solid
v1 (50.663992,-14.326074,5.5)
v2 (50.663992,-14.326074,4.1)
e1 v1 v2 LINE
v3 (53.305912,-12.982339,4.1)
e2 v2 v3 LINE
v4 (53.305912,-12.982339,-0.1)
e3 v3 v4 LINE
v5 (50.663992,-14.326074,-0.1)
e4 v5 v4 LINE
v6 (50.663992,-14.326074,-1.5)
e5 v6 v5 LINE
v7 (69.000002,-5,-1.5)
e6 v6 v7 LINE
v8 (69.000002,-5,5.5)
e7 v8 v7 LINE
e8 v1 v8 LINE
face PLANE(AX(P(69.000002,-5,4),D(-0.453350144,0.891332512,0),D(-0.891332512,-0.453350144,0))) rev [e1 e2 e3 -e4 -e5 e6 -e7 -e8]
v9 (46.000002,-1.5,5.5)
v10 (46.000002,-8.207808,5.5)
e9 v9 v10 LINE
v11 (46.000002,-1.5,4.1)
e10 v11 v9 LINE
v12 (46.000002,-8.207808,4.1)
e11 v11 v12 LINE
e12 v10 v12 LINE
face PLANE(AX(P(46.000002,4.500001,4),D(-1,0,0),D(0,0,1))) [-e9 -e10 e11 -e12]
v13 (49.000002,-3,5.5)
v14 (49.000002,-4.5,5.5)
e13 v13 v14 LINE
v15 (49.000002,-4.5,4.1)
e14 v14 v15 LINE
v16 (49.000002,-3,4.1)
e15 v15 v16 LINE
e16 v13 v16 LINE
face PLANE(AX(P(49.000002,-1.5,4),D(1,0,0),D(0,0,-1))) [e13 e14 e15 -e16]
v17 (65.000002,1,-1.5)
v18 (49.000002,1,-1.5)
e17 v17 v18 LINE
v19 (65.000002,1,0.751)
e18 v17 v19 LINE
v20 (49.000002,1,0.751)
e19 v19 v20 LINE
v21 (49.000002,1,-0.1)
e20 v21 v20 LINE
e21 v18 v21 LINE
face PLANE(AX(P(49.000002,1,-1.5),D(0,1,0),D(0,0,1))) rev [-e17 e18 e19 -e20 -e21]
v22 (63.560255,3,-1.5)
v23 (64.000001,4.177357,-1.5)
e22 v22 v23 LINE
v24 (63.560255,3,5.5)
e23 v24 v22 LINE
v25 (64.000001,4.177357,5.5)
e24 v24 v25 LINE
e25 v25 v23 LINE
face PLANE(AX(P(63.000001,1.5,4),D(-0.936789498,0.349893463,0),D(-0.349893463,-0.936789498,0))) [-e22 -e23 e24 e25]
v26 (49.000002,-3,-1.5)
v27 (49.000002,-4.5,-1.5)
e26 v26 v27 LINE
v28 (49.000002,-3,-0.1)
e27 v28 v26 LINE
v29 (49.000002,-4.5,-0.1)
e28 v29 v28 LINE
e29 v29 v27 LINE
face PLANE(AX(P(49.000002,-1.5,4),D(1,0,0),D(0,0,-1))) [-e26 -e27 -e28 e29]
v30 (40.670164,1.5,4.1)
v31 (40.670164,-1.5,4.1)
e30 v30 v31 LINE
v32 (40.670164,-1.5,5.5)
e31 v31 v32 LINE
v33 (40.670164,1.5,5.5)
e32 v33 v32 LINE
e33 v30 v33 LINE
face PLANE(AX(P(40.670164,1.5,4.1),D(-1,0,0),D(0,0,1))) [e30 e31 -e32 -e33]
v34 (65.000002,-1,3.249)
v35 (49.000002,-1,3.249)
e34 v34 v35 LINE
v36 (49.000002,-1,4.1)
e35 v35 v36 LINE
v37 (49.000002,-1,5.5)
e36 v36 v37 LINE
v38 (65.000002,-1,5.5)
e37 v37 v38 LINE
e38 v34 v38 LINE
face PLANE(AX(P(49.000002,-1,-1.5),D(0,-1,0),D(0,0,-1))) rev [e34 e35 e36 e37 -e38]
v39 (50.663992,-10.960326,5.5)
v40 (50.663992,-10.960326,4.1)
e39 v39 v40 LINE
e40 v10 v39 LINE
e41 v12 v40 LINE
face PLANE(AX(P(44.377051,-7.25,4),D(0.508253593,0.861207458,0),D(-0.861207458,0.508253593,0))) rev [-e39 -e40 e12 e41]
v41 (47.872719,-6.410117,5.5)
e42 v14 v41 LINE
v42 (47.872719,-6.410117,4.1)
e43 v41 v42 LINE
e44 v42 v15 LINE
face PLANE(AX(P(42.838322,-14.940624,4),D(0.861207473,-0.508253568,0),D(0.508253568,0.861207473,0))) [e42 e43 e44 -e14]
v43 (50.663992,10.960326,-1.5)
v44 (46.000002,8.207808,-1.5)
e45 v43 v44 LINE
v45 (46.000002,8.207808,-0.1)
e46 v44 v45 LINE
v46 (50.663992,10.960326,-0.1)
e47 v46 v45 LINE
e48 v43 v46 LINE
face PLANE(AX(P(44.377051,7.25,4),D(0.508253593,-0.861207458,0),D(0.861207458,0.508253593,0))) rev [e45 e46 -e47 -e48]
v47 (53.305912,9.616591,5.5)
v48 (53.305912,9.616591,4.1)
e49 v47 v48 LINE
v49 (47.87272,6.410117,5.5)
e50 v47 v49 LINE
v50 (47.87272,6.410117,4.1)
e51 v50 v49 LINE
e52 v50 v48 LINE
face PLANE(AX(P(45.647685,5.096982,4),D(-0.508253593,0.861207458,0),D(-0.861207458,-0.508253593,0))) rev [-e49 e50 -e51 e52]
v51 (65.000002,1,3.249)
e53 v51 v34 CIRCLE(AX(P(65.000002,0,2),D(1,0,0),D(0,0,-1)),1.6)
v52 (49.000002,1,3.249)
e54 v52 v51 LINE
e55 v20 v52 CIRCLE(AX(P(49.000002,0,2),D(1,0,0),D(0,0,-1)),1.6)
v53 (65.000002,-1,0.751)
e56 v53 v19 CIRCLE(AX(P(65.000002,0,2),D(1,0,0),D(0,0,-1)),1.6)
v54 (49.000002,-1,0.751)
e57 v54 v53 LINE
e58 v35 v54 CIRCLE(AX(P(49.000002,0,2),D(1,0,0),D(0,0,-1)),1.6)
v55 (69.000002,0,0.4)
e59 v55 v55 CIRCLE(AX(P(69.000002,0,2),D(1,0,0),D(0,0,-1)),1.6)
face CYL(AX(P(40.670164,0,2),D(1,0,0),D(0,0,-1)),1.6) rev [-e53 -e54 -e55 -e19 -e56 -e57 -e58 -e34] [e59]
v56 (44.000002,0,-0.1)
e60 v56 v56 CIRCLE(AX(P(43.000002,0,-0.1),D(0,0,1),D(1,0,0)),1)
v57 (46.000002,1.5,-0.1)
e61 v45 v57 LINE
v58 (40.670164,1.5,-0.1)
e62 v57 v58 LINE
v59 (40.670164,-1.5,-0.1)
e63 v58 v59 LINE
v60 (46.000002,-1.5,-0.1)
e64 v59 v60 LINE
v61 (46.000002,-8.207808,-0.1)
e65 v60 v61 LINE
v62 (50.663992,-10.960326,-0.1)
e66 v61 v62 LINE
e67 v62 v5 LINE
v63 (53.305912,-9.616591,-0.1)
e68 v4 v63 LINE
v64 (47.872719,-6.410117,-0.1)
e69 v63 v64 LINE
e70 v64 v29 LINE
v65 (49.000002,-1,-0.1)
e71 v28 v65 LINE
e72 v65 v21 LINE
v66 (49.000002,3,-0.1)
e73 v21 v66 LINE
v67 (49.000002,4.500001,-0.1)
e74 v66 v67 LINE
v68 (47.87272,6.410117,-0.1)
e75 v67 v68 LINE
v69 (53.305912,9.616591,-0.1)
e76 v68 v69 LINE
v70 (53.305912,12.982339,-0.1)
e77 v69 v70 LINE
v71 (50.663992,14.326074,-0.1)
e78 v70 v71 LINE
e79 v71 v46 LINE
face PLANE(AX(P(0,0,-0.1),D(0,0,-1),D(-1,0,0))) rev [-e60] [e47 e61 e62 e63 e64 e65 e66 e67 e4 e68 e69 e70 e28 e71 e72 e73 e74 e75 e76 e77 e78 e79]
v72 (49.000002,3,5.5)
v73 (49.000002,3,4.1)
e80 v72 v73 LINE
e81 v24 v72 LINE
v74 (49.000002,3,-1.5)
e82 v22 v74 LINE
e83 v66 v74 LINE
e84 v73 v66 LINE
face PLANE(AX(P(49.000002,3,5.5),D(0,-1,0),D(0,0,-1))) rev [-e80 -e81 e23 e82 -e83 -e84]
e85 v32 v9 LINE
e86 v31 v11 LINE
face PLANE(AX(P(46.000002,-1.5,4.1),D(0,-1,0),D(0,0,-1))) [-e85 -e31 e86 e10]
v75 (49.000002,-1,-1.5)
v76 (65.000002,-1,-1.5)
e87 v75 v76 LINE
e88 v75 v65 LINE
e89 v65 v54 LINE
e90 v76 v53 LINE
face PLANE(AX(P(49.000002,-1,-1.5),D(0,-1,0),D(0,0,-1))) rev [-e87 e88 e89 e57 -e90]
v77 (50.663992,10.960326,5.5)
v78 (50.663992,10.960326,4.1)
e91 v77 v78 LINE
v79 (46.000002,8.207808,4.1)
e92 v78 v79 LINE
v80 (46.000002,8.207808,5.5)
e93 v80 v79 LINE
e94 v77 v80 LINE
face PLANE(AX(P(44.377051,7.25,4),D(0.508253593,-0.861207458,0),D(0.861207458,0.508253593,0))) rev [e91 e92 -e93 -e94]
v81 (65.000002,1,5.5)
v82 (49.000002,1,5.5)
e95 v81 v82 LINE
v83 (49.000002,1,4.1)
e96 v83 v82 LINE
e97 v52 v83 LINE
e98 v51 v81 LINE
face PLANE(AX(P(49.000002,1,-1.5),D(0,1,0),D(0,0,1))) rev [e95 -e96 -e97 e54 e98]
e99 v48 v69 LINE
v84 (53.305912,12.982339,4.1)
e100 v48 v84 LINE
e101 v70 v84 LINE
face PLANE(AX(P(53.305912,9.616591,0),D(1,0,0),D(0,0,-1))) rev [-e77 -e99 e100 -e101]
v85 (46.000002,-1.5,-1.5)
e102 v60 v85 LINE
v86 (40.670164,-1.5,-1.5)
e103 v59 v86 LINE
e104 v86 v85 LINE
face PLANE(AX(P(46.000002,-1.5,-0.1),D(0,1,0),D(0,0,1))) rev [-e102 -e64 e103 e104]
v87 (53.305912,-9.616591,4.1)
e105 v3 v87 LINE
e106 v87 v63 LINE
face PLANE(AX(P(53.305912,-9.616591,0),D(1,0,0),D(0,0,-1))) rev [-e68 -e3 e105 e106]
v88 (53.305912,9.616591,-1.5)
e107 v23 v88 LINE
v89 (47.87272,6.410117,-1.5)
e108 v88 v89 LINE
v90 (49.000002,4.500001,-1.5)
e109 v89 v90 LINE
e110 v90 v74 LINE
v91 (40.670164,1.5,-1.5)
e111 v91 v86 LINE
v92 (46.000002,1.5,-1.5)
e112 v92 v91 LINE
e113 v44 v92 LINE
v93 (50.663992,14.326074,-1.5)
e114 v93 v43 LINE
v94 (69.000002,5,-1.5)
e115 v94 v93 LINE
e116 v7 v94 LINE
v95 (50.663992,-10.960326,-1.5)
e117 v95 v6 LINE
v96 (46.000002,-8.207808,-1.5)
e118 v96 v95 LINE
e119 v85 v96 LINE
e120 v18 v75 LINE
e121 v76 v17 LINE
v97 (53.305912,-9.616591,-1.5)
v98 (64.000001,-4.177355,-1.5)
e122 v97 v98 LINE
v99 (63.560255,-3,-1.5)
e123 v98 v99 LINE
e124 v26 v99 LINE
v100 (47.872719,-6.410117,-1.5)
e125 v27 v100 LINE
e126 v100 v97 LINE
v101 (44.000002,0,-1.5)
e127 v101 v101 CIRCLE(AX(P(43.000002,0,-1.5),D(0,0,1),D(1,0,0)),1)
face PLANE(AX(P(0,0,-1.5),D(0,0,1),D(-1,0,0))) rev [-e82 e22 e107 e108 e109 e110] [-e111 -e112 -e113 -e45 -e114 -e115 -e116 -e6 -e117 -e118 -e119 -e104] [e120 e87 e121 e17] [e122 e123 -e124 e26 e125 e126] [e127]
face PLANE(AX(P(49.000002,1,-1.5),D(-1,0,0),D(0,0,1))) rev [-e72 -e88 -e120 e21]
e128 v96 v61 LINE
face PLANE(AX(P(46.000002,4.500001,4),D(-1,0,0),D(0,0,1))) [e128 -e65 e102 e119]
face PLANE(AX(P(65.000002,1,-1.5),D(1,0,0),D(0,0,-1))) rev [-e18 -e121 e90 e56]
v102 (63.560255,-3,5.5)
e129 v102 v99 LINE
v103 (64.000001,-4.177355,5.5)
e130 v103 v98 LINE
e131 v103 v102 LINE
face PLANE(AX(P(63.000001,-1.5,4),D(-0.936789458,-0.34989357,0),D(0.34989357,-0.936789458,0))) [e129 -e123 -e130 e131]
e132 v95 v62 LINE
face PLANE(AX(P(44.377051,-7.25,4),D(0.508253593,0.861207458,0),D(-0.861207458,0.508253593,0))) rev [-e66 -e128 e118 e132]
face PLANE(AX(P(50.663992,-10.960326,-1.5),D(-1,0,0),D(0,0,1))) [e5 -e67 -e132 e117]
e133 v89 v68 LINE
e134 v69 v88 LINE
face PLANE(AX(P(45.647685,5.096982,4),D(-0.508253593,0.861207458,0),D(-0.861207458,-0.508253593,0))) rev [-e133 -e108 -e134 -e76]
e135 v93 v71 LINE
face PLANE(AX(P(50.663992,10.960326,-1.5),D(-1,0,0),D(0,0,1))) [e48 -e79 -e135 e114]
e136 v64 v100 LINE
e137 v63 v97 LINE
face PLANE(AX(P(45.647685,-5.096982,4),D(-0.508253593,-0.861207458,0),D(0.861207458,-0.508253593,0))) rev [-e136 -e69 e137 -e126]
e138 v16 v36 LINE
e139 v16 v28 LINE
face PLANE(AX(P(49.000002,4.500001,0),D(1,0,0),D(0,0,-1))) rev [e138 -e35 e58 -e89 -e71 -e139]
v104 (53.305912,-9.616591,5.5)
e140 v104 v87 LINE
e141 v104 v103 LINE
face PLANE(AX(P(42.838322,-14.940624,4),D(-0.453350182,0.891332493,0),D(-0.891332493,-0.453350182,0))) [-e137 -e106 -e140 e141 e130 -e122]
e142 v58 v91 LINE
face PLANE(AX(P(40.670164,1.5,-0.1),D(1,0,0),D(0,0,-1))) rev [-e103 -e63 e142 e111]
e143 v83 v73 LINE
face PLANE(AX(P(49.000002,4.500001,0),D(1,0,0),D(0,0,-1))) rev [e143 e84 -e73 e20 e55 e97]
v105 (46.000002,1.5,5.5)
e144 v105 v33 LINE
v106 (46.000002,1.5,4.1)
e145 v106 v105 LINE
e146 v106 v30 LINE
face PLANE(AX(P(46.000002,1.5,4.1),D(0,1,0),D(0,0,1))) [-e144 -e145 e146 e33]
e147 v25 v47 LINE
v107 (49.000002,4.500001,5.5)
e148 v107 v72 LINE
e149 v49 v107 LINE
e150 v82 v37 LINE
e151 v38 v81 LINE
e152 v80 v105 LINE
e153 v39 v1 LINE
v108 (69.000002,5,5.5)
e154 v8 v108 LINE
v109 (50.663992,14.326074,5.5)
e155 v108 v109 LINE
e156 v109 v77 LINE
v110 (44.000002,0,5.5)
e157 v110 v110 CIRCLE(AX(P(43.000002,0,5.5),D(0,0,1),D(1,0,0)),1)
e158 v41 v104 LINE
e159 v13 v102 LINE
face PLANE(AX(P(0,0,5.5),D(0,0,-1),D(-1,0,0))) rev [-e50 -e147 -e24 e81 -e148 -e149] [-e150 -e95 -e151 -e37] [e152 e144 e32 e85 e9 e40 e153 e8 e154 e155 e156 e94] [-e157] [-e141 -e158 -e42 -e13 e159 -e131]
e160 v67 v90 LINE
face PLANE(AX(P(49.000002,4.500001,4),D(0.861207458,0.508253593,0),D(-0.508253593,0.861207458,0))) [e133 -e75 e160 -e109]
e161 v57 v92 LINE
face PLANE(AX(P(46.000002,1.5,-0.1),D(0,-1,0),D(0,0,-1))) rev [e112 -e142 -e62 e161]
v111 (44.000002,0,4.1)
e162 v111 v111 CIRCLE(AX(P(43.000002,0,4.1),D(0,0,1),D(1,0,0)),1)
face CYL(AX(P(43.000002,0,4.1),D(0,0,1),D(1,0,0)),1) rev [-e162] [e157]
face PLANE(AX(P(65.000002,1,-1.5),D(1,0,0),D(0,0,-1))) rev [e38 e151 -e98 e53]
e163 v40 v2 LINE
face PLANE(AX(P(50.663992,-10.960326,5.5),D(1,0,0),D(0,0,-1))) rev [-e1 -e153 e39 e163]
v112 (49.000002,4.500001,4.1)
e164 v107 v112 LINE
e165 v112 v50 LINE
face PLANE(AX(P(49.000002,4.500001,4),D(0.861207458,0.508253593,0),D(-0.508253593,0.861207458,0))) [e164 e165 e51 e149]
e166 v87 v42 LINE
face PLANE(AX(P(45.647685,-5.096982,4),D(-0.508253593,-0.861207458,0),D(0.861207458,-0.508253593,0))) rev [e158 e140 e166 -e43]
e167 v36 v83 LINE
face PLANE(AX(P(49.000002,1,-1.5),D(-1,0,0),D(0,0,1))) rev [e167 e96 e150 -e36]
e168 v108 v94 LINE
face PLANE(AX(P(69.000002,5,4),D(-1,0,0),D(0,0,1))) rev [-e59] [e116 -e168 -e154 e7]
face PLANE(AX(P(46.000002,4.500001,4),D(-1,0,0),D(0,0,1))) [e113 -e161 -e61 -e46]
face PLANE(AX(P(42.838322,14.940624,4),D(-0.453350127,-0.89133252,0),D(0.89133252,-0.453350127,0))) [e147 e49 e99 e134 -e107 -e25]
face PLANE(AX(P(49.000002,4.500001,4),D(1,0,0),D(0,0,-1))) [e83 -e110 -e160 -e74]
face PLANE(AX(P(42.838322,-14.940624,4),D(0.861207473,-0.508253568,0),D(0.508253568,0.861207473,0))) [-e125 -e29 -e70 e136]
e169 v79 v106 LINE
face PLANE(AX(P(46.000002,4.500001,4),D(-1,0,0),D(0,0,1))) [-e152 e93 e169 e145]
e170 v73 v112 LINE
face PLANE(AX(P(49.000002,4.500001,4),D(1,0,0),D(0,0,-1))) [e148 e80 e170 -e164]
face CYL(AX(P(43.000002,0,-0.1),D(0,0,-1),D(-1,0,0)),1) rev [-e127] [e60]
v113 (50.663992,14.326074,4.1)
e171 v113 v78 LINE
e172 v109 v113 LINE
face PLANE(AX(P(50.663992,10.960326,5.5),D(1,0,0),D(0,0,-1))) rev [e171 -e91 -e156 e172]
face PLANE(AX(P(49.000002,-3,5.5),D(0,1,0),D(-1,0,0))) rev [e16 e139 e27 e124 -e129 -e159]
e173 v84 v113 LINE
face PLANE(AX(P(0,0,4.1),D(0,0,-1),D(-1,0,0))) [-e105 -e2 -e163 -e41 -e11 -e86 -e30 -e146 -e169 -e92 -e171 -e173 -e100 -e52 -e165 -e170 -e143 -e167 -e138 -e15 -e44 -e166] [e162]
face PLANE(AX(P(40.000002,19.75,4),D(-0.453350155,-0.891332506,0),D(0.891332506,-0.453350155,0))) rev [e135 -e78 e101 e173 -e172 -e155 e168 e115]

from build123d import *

# Parameters (mm, degrees)
EXTRUDE_1_DEPTH     = 4
SKETCH_2_R          = 0.9
CUT_EXTRUDE_1_DEPTH = 52
SKETCH_3_W          = 2.000000328
SKETCH_3_H          = 4.999999888
EXTRUDE_2_DEPTH     = 1.5
EXTRUDE_3_DEPTH     = 4
EXTRUDE_4_DEPTH     = 1.5
CUT_EXTRUDE_2_DEPTH = 2
SKETCH_8_W          = 56.707929928
SKETCH_8_H          = 61.814331201
CUT_EXTRUDE_3_DEPTH = 10
EXTRUDE_5_DEPTH     = 2
CUT_EXTRUDE_5_DEPTH = 2.1
SKETCH_12_W         = 5.329837581
SKETCH_12_H         = 3.000000026
SKETCH_12_R         = 1
EXTRUDE_6_DEPTH     = 1.4
SKETCH_13_W         = 16.000000485
SKETCH_13_H         = 2
CUT_EXTRUDE_6_DEPTH = 71.818335642
EXTRUDE_7_DEPTH     = 3.5
SKETCH_10_R         = 1.6
CUT_EXTRUDE_7_DEPTH = 33.219032999


with BuildPart() as part:
    # 草图1 → 凸台-拉伸1 (new body)
    with BuildSketch(Plane.XY):
        with BuildLine():
            Line((66.000003368, -0.999999465), (66.000003368, 1.000000862))
            ThreePointArc((66.000003368, 1.000000862), (65.646447605, 1.853552596), (66.500000656, 1.500000013))
            Line((66.500000656, 1.500000013), (69.000001997, 1.500000013))
            Line((69.000001997, 1.500000013), (69.000001997, 4.999999655))
            Line((69.000001997, 4.999999655), (40.0000019, 19.749999745))
            Line((40.0000019, 19.749999745), (37.000001874, 19.749999745))
            Line((37.000001874, 19.749999745), (37.000001874, 17.250002129))
            ThreePointArc((37.000001874, 17.250002129), (37.353555819, 16.396448761), (36.500001792, 16.750001116))
            Line((36.500001792, 16.750001116), (34.500001871, 16.750001116))
            ThreePointArc((34.500001871, 16.750001116), (33.646447808, 16.396448765), (34.000001848, 17.250002129))
            Line((34.000001848, 17.250002129), (34.000001848, 19.749999745))
            Line((34.000001848, 19.749999745), (31.000001822, 19.749999745))
            Line((31.000001822, 19.749999745), (31.000001822, 16.750001116))
            Line((31.000001822, 16.750001116), (34.000001848, 13.000000967))
            Line((34.000001848, 13.000000967), (34.000001848, 2.500000177))
            Line((34.000001848, 2.500000177), (19.492642954, 2.500000177))
            Line((19.492642954, 2.500000177), (10.000001639, 13.915917603))
            Line((10.000001639, 13.915917603), (10.000001639, 19.749999745))
            Line((10.000001639, 19.749999745), (7.000001147, 19.749999745))
            Line((7.000001147, 19.749999745), (7.000001147, 17.250002129))
            ThreePointArc((7.000001147, 17.250002129), (7.353556004, 16.396449439), (6.500001997, 16.750001116))
            Line((6.500001997, 16.750001116), (3.500001505, 16.750001116))
            ThreePointArc((3.500001505, 16.750001116), (2.646447808, 16.396449749), (3.000002354, 17.250002129))
            Line((3.000002354, 17.250002129), (3.000002354, 19.749999745))
            Line((3.000002354, 19.749999745), (0, 19.749999745))
            Line((0, 19.749999745), (0, -19.749999745))
            Line((0, -19.749999745), (3.000002354, -19.749999745))
            Line((3.000002354, -19.749999745), (3.000002354, -17.249999742))
            ThreePointArc((3.000002354, -17.249999742), (2.646448465, -16.39644732), (3.500001505, -16.749999719))
            Line((3.500001505, -16.749999719), (6.500001997, -16.749999719))
            ThreePointArc((6.500001997, -16.749999719), (7.353555348, -16.396447009), (7.000001147, -17.249999742))
            Line((7.000001147, -17.249999742), (7.000001147, -19.749999745))
            Line((7.000001147, -19.749999745), (10.000001639, -19.749999745))
            Line((10.000001639, -19.749999745), (10.000001639, -13.915917138))
            Line((10.000001639, -13.915917138), (19.492642954, -2.499999711))
            Line((19.492642954, -2.499999711), (34.000001848, -2.499999711))
            Line((34.000001848, -2.499999711), (34.000001848, -12.999999803))
            Line((34.000001848, -12.999999803), (31.000001822, -16.749999719))
            Line((31.000001822, -16.749999719), (31.000001822, -19.749999745))
            Line((31.000001822, -19.749999745), (34.000001848, -19.749999745))
            Line((34.000001848, -19.749999745), (34.000001848, -17.249999742))
            ThreePointArc((34.000001848, -17.249999742), (33.646448464, -16.396446335), (34.500001871, -16.749999719))
            Line((34.500001871, -16.749999719), (36.500001792, -16.749999719))
            ThreePointArc((36.500001792, -16.749999719), (37.353555162, -16.396446331), (37.000001874, -17.249999742))
            Line((37.000001874, -17.249999742), (37.000001874, -19.749999745))
            Line((37.000001874, -19.749999745), (40.0000019, -19.749999745))
            Line((40.0000019, -19.749999745), (69.000001997, -5.000000121))
            Line((69.000001997, -5.000000121), (69.000001997, -1.499999547))
            Line((69.000001997, -1.499999547), (66.500000656, -1.499999547))
            ThreePointArc((66.500000656, -1.499999547), (65.646447327, -1.853550818), (66.000003368, -0.999999465))
        make_face()
        Polygon((37.000001874, 13.000000967), (37.000001874, 1.500000013), (46.000001952, 1.500000013), (46.000001952, 4.500000505), (40.0000019, 14.666666044), align=None, mode=Mode.SUBTRACT)
        Polygon((42.838321999, -14.940624125), (49.000001512, -4.500000039), (49.000001512, -1.499999547), (63.000001013, -1.499999547), (64.000001177, -4.17735544), align=None, mode=Mode.SUBTRACT)
        Polygon((46.000001952, -1.499999547), (37.000001874, -1.499999547), (37.000001874, -12.999999803), (40.0000019, -14.666666277), (46.000001952, -4.500000039), align=None, mode=Mode.SUBTRACT)
        Polygon((63.000001013, 1.500000013), (64.000001177, 4.177356837), (42.838321999, 14.940623892), (49.000001512, 4.500000505), (49.000001512, 1.500000013), align=None, mode=Mode.SUBTRACT)
        Polygon((3.000002354, -13.749999693), (7.000001147, -13.749999693), (18.065146907, -1.59e-07), (7.000001147, 13.750000624), (3.000002354, 13.750000624), align=None, mode=Mode.SUBTRACT)
    extrude(amount=EXTRUDE_1_DEPTH)

    # 草图2 → 切除-拉伸1 (cut)
    with BuildSketch(Plane.XZ.offset(16.749999719)):
        with Locations((5.000002354, 2)):
            Circle(SKETCH_2_R)
    extrude(amount=-CUT_EXTRUDE_1_DEPTH, mode=Mode.SUBTRACT)

    # 草图3 → 凸台-拉伸2 (add)
    with BuildSketch(Plane.XY.offset(4)):
        Polygon((3.000002354, 12.413031189), (3.000002354, 13.750000624), (0, 12.680980144), (0, 10.680979816), align=None)
        with Locations((23.000001907, 2.33e-07)):
            Rectangle(SKETCH_3_W, SKETCH_3_H)
        Polygon((3.000002354, -13.749999693), (3.000002354, -12.413030723), (0, -10.680979816), (0, -12.680979678), align=None)
    extrude(amount=EXTRUDE_2_DEPTH)

    # 草图5 → 凸台-拉伸3 (add)
    with BuildSketch(Plane.XY):
        Polygon((37.000001874, 7.25000049), (44.377050947, 7.25000049), (50.66399207, 10.960326481), (53.305912072, 9.616591408), (45.647685021, 5.0969819), (37.000001874, 5.0969819), align=None)
        Polygon((37.000001874, -5.0969819), (45.647685021, -5.0969819), (53.305912072, -9.616591408), (50.66399207, -10.960326481), (44.377050947, -7.25000049), (37.000001874, -7.25000049), align=None)
    extrude(amount=EXTRUDE_3_DEPTH)

    # 草图6 → 凸台-拉伸4 (add)
    with BuildSketch(Plane.XY.offset(4)):
        Polygon((46.000001952, 1.500000013), (46.000001952, 8.207807662), (50.66399207, 10.960326481), (50.66399207, 14.326073696), (69.000001997, 4.999999655), (69.000001997, -4.999999655), (50.66399207, -14.326073696), (50.66399207, -10.960326481), (46.000001952, -8.207807662), (46.000001952, -1.500000013), align=None)
        Polygon((47.872719576, 6.410117076), (49.000001512, 4.500000505), (49.000001512, 1.500000013), (63.000001013, 1.500000013), (64.000001177, 4.177356837), (53.305912072, 9.616591408), align=None, mode=Mode.SUBTRACT)
        Polygon((47.872719428, -6.410116989), (53.305912072, -9.616591408), (64.000001177, -4.17735544), (63.000001013, -1.499999547), (49.000001512, -1.499999547), (49.000001512, -4.500000039), align=None, mode=Mode.SUBTRACT)
    extrude_4 = extrude(amount=EXTRUDE_4_DEPTH)

    # 镜向1: 凸台-拉伸4 across plane
    add(extrude_4.mirror(Plane.XY.offset(2)))

    # 草图7 → 切除-拉伸2 (cut, symmetric)
    with BuildSketch(Plane.XY.offset(2)):
        Polygon((53.305912072, 9.616591408), (53.305912072, 26.339155223), (-8.888654397, 26.339155223), (-8.888654397, -26.339155223), (53.305912072, -26.339155223), (53.305912072, -9.616591408), (47.872719576, -6.410117076), (49.000001512, -4.500000505), (49.000001512, -1.500000013), (49.000001512, 1.500000013), (49.000001512, 4.500000505), (47.872719576, 6.410117076), align=None)
    extrude(amount=CUT_EXTRUDE_2_DEPTH, both=True, mode=Mode.SUBTRACT)


with BuildPart() as cut_extrude_2_piece_1:
    # of the separate pieces the step leaves, piece 1, a body of its own (cut_extrude_2_pieces)
    add(part.part.solids().sort_by_distance((50.66399207, 10.960326481, 0))[0])

    # 草图9 → 凸台-拉伸5 (add, symmetric)
    with BuildSketch(Plane.XY.offset(2)):
        with BuildLine():
            Line((66.500000656, -1.499999547), (69.000001997, -1.499999547))
            Line((69.000001997, -1.499999547), (69.000001997, 1.500000013))
            Line((69.000001997, 1.500000013), (66.500000656, 1.500000013))
            ThreePointArc((66.500000656, 1.500000013), (65.646447605, 1.853552596), (66.000003368, 1.000000862))
            Line((66.000003368, 1.000000862), (66.000003368, -0.999999465))
            ThreePointArc((66.000003368, -0.999999465), (65.646447327, -1.853550818), (66.500000656, -1.499999547))
        make_face()
    extrude(amount=EXTRUDE_5_DEPTH, both=True)

    # 草图11 → 切除-拉伸5 (cut, symmetric)
    with BuildSketch(Plane.XY.offset(2)):
        Polygon((49.000001512, -4.500000039), (47.872719428, -6.410116989), (53.305912072, -9.616591408), (53.305912072, -12.982338518), (50.66399207, -14.326073696), (50.66399207, -10.960326481), (46.000001952, -8.207807662), (46.000001952, 8.207807662), (50.66399207, 10.960326481), (50.66399207, 14.326073696), (53.305912072, 12.982338518), (53.305912072, 9.616591408), (47.872719576, 6.410117076), (49.000001512, 4.500000505), align=None)
    extrude(amount=CUT_EXTRUDE_5_DEPTH, both=True, mode=Mode.SUBTRACT)

    # 草图12 → 凸台-拉伸6 (add)
    with BuildSketch(Plane.XY.offset(5.5)):
        with Locations((43.335083162, 0)):
            Rectangle(SKETCH_12_W, SKETCH_12_H)
        with Locations((43.000001952, 0)):
            Circle(SKETCH_12_R, mode=Mode.SUBTRACT)
    extrude_6 = extrude(amount=-EXTRUDE_6_DEPTH)

    # 镜向2: 凸台-拉伸6 across plane
    add(extrude_6.mirror(Plane.XY.offset(2)))

    # 草图13 → 切除-拉伸6 (cut, through all)
    with BuildSketch(Plane.XY.offset(5.5)):
        with Locations((57.000001755, 0)):
            Rectangle(SKETCH_13_W, SKETCH_13_H)
    extrude(amount=-CUT_EXTRUDE_6_DEPTH, mode=Mode.SUBTRACT)


with BuildPart() as cut_extrude_2_piece_2:
    # of the separate pieces the step leaves, piece 2, a body of its own (cut_extrude_2_pieces)
    add(part.part.solids().sort_by_distance((24.000002071, -2.499999711, 4))[0])


with BuildPart() as cut_extrude_2_piece_3:
    # of the separate pieces the step leaves, piece 3, a body of its own (cut_extrude_2_pieces)
    add(part.part.solids().sort_by_distance((0, 12.680980144, 4))[0])


with BuildPart() as cut_extrude_2_piece_4:
    # of the separate pieces the step leaves, piece 4, a body of its own (cut_extrude_2_pieces)
    add(part.part.solids().sort_by_distance((0, -12.680979678, 4))[0])


with BuildPart() as cut_extrude_3_tool:
    # 草图8 → 切除-拉伸3 (new body)
    with BuildSketch(Plane.XY.offset(2)):
        with Locations((4.165748407, 0.134378981)):
            Rectangle(SKETCH_8_W, SKETCH_8_H)
    extrude(amount=CUT_EXTRUDE_3_DEPTH)


with BuildPart() as cut_extrude_2_piece_2_1:
    add(cut_extrude_2_piece_2.part)

    # 切除-拉伸3: cut by cut_extrude_3_tool
    add(cut_extrude_3_tool.part, mode=Mode.SUBTRACT)


with BuildPart() as cut_extrude_2_piece_3_1:
    add(cut_extrude_2_piece_3.part)

    # 切除-拉伸3: cut by cut_extrude_3_tool
    add(cut_extrude_3_tool.part, mode=Mode.SUBTRACT)


with BuildPart() as cut_extrude_2_piece_4_1:
    add(cut_extrude_2_piece_4.part)

    # 切除-拉伸3: cut by cut_extrude_3_tool
    add(cut_extrude_3_tool.part, mode=Mode.SUBTRACT)


with BuildPart() as extrude_7_tool:
    # 草图14 → 凸台-拉伸7 (new, symmetric)
    with BuildSketch(Plane.XY.offset(2)):
        Polygon((49.000001512, 3.000000013), (63.560255154, 3.000000013), (63.000001013, 1.500000013), (49.000001512, 1.500000013), align=None)
        Polygon((49.000001512, -3.000000013), (49.000001512, -1.500000013), (63.000001013, -1.500000013), (63.560255154, -3.000000013), align=None)
    extrude(amount=EXTRUDE_7_DEPTH, both=True)


with BuildPart() as cut_extrude_2_piece_1_1:
    add(cut_extrude_2_piece_1.part)


with BuildPart() as cut_extrude_2_piece_1_2:
    # 凸台-拉伸7: joined with extrude_7_tool
    add(cut_extrude_2_piece_1_1.part.fuse(extrude_7_tool.part, tol=0.00001))

    # 草图10 → 切除-拉伸7 (cut, through all)
    with BuildSketch(Plane(origin=(69.000001997, 0, 0), x_dir=(0, 0, -1), z_dir=(1, 0, 0))):
        with Locations((-2, 0)):
            Circle(SKETCH_10_R)
    extrude(amount=-CUT_EXTRUDE_7_DEPTH, mode=Mode.SUBTRACT)


solid = cut_extrude_2_piece_1_2.part
